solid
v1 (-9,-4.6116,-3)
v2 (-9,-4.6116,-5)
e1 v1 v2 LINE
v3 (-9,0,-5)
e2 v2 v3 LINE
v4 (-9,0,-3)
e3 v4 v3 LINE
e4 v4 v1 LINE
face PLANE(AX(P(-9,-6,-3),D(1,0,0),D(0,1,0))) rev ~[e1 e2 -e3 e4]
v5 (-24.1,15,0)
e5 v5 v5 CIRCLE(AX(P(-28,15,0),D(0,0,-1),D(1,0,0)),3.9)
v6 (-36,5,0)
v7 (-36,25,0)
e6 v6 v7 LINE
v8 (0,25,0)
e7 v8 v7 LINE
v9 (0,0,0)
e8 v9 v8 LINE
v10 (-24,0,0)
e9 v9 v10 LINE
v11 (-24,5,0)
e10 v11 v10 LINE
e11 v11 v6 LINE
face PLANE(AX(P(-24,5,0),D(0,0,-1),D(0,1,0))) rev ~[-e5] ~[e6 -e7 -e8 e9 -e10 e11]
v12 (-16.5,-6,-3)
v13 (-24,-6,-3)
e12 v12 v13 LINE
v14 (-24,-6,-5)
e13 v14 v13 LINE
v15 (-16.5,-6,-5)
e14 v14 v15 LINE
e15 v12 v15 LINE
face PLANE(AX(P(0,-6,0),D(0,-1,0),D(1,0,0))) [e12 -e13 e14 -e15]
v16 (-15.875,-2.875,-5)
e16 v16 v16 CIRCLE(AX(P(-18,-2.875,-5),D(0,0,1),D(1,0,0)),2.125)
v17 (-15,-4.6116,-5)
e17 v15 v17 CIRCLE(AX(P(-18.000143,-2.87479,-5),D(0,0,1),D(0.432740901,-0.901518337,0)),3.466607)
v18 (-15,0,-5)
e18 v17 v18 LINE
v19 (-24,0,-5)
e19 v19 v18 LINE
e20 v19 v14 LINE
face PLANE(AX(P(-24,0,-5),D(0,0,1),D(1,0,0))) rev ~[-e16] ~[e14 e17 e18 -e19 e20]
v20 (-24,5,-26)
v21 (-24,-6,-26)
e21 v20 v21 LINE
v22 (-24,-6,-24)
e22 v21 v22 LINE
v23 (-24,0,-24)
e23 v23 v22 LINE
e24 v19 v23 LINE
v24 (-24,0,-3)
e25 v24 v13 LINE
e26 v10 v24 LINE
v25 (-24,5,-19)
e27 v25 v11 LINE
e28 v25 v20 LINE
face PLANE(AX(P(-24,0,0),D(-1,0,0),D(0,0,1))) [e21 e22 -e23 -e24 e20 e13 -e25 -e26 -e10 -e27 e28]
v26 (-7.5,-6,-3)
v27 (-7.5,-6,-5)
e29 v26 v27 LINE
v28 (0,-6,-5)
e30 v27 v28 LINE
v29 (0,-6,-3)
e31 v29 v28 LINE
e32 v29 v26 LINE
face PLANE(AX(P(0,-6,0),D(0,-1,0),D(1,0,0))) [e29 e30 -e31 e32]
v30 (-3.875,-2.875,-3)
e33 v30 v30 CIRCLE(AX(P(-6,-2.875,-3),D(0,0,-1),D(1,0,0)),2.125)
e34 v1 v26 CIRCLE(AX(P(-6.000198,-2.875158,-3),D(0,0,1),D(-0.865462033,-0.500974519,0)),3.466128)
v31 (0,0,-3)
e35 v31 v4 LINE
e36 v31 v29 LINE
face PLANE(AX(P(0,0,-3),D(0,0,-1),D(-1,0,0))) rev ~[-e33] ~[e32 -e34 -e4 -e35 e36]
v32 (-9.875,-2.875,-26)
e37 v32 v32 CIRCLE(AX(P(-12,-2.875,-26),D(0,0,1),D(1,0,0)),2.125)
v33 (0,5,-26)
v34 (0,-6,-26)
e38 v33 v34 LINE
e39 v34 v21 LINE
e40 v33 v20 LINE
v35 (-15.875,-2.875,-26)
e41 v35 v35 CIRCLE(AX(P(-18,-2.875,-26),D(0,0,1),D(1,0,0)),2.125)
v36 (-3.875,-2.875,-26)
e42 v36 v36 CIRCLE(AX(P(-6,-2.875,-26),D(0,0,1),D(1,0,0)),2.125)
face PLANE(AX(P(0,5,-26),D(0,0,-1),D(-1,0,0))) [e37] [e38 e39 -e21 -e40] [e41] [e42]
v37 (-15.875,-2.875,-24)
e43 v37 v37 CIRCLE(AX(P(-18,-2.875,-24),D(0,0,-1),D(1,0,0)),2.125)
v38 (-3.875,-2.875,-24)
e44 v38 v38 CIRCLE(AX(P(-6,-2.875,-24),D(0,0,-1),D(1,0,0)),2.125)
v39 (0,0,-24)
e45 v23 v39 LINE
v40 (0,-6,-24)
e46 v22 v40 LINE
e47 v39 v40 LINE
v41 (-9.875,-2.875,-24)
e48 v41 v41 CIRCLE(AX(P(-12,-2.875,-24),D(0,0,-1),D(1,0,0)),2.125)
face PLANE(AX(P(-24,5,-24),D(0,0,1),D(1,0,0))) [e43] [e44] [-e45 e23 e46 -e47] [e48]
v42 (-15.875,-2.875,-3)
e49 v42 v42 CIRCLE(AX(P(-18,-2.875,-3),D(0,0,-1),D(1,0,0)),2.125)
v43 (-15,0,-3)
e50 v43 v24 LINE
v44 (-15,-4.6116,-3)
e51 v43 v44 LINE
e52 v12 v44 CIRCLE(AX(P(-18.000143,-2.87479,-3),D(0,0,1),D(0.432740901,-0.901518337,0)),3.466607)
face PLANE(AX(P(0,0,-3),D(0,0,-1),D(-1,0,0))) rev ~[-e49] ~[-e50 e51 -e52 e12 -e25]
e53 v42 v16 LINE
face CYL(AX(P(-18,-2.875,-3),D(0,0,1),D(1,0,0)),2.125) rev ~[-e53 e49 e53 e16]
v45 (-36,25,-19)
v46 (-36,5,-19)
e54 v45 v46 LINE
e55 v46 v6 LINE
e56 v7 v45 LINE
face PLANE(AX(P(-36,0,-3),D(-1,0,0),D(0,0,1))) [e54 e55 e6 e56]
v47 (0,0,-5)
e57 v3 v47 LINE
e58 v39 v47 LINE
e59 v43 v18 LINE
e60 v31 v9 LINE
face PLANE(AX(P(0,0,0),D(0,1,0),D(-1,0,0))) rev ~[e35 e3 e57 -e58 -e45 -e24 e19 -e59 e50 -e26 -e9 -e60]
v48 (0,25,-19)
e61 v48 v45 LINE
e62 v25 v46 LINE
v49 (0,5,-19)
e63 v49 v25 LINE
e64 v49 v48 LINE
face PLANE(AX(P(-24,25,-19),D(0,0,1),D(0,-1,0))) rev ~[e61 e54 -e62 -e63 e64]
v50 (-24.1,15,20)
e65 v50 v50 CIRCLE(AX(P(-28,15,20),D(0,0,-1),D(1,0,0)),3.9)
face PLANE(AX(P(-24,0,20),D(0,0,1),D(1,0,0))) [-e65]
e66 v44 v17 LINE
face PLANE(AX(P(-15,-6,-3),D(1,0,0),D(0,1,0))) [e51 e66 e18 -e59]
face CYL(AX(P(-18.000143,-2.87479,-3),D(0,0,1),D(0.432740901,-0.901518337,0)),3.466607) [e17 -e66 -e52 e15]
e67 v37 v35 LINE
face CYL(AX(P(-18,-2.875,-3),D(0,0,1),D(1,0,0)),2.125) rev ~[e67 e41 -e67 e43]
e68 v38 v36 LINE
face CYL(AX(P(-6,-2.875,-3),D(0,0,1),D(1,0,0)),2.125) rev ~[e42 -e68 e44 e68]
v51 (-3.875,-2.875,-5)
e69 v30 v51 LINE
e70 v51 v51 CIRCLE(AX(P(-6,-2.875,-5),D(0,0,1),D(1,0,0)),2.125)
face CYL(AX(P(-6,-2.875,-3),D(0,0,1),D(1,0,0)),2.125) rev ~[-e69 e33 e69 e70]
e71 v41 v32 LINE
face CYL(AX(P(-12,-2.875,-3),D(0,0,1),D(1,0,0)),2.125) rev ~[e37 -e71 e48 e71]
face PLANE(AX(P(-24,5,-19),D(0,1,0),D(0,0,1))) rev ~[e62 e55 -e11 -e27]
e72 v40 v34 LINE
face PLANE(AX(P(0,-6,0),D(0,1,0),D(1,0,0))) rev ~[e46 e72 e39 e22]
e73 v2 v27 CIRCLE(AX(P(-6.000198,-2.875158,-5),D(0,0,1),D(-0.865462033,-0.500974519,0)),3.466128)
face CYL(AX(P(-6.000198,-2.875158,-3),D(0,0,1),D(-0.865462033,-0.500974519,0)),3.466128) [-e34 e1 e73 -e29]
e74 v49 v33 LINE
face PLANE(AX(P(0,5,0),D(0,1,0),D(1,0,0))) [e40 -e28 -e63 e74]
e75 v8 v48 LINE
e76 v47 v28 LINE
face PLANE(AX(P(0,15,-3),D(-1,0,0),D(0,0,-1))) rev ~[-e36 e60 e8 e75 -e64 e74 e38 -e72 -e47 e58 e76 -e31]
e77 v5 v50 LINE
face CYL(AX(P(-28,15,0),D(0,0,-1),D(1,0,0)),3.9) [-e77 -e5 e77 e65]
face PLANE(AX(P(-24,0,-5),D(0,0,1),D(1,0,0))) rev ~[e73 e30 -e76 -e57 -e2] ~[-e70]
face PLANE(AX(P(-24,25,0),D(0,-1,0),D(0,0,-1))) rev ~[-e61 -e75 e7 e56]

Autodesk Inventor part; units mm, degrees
ref_plane "YZ Plane" through (0, 0, 0) normal (1, 0, 0) x (0, 1, 0)
ref_plane "XZ Plane" through (0, 0, 0) normal (0, 1, 0) x (-1, 0, 0)
ref_plane "XY Plane" through (0, 0, 0) normal (0, 0, 1) x (1, 0, 0)
sketch "Sketch1" plane through (0, 0, 0) normal (0, 1, 0) x (-1, 0, 0)
  line L0 (0, 0) -> (24, 0)
  line L1 (24, 0) -> (24, -24)
  line L2 (24, -24) -> (0, -24)
  line L3 (0, -24) -> (0, 0)
  dimension "d0" = 24
  dimension "d1" = 24
extrude "Extrusion1" add sketch "Sketch1" along normal blind 5
sketch "Sketch2" plane through (0, 0, 0) normal (0, -1, 0) x (1, 0, 0)
  line L0 (0, 0) -> (0, -3)
  line L1 (0, 0) -> (0, -24) projected
  line L2 (-24, -24) -> (-24, 0) projected
  line L3 (0, -3) -> (-24, -3)
  line L4 (-24, -3) -> (-24, -5)
  line L5 (-24, -5) -> (0, -5)
  line L6 (0, -5) -> (0, -3)
  dimension "d4" = 3
  dimension "d5" = 2
extrude "Extrusion2" add sketch "Sketch2" along normal blind 6
sketch "Sketch3" plane through (-24, 0, -3) normal (0, 0, 1) x (1, 0, 0)
  line L0 (24, -6) -> (0, -6)
  line L1 (0, -6) -> (24, -6) projected
  line L2 (12, -6) -> (12, -5)
  line L3 (12, -5) -> (12, -2.875)
  circle A0 centre (12, -2.875) radius 2.125
  point P0 (24, 0)
  dimension "d8" = 1
  dimension "d11" = 2.125
  dimension "d12" = 4.25
sketch "Sketch4" plane through (0, 5, 0) normal (0, 1, 0) x (1, 0, 0)
  line L0 (-24, 24) -> (0, 24)
  line L1 (0, 24) -> (0, 26)
  line L2 (0, 26) -> (-24, 26)
  line L3 (-24, 26) -> (-24, 24)
  point P0 (0, 0)
  dimension "d13" = 2
extrude "Extrusion3" add sketch "Sketch4" against normal blind 11
sketch "Sketch5" plane through (0, 5, 0) normal (0, 1, 0) x (1, 0, 0)
  line L0 (-24, 5) -> (-24, 24) projected
  line L1 (0, 3) -> (-24, 3)
  line L2 (-24, 3) -> (-24, 9)
  line L3 (-24, 9) -> (0, 9)
  line L4 (0, 9) -> (0, 3)
  point P0 (0, 0)
  dimension "d16" = 6
extrude "Extrusion4" add sketch "Sketch5" along normal blind 10
extrude "Extrusion6" cut sketch "Sketch3" against normal through all
pattern_linear "Rectangular Pattern1" count 3 spacing 6 along (-1, 0, 0) of "Extrusion6" first direction both ways yes
sketch "Sketch7" plane through (0, 5, -26) normal (0, 0, -1) x (-1, 0, 0)
  circle A0 centre (18, -7.875) radius 2.125 projected
  line L0 (15.875, -7.875) -> (14.125, -7.875)
  circle A1 centre (12, -7.875) radius 2.125 projected
  circle A2 centre (6, -7.875) radius 2.125 projected
  line L1 (8.125, -7.875) -> (9.875, -7.875)
  line L2 (15, -7.875) -> (15, -11)
  line L3 (24, -11) -> (0, -11) projected
  line L4 (9, -7.875) -> (9, -5)
  line L5 (0, -5) -> (24, -5) projected
  line L6 (15, -11) -> (9, -11)
  line L7 (9, -11) -> (9, -5)
  line L8 (9, -5) -> (15, -5)
  line L9 (15, -5) -> (15, -11)
sketch "Sketch8" plane through (-24, 0, -3) normal (0, 0, 1) x (1, 0, 0)
  circle A0 centre (18, -2.875) radius 2.125 projected
  line L0 (15.875, -2.875) -> (14.125, -2.875)
  circle A1 centre (12, -2.875) radius 2.125 projected
  line L1 (9.875, -2.875) -> (8.125, -2.875)
  circle A2 centre (6, -2.875) radius 2.125 projected
  line L2 (0, -6) -> (24, -6) projected
  line L3 (9, -6) -> (9, 0)
  line L4 (24, 0) -> (0, 0) projected
  line L5 (15, -6) -> (15, 0)
  line L6 (15, -6) -> (9, -6)
  line L7 (9, -6) -> (9, 0)
  line L8 (9, 0) -> (15, 0)
  line L9 (15, 0) -> (15, -6)
extrude "Extrusion7" cut sketch "Sketch8" against normal blind 2 contours L5 L2 L3 L1 A1 L0 | L0 A1 L1 L3 L4 L5
sketch "Sketch9" plane through (0, -6, -3) normal (0, 0, 1) x (1, 0, 0)
  line L0 (-9, 6) -> (-9, 0) projected
  line L1 (-9, 0) -> (0, 0) projected
  circle A0 centre (-6, 3.125) radius 2.125 projected
  line L2 (-15, 0) -> (-15, 6) projected
  line L3 (-24, 0) -> (0, 0) projected
  circle A1 centre (-18, 3.125) radius 2.125 projected
  line L4 (-9, 0) -> (-7.5, 0)
  line L5 (-15, 0) -> (-16.5, 0)
  line L6 (-9, 0) -> (-9, 1.3884)
  arc A2 (-9, 1.3884) -> (-7.5, 0) centre (-6, 3.125) ccw
  line L7 (-15, 0) -> (-15, 1.3884)
  arc A3 (-16.5, 0) -> (-15, 1.3884) centre (-18, 3.125) ccw
  point P0 (0, 6)
  dimension "d33" = 1.5
  dimension "d34" = 1.5
extrude "Extrusion8" cut sketch "Sketch9" against normal blind 2 contours A2 L1 L0 | L3 A3 L2
sketch "Sketch10" plane through (0, 0, 0) normal (1, 0, 0) x (0, 0, -1)
  line L0 (9, 5) -> (19, 5)
  line L1 (19, 5) -> (19, 15)
  line L2 (19, 15) -> (9, 15)
  line L3 (9, 15) -> (9, 5)
  point P0 (0, 0)
  dimension "d37" = 10
extrude "Extrusion9" add sketch "Sketch10" against normal blind 24
sketch "Sketch11" plane through (0, 15, 0) normal (0, 1, 0) x (1, 0, 0)
  line L0 (0, 5) -> (0, 19)
  line L1 (0, 19) -> (-24, 19)
  line L2 (-24, 19) -> (-24, 3)
  line L3 (-24, 3) -> (0, 3)
  line L4 (0, 3) -> (0, 19)
  point P0 (0, 0)
  point P1 (-24, 5)
extrude "Extrusion10" add sketch "Sketch11" along normal blind 10
sketch "Sketch13" plane through (0, 0, 0) normal (1, 0, 0) x (0, 0, -1)
  line L0 (3, 25) -> (19, 25)
  line L1 (19, 25) -> (19, 5)
  line L2 (19, 5) -> (3, 5)
  line L3 (3, 5) -> (3, 25)
  point P0 (0, 0)
extrude "Extrusion11" add sketch "Sketch13" along normal blind 12
sketch "Sketch14" plane through (-24, 5, -3) normal (0, 0, 1) x (1, 0, 0)
  line L0 (24, 0) -> (24, 20)
  line L1 (0, 20) -> (36, 20) projected
  line L2 (24, 10) -> (32, 10)
  circle A0 centre (28, 10) radius 3.75
  point P0 (24, -5)
  dimension "d44" = 8
  dimension "d45" = 7.5
extrude "Extrusion12" add sketch "Sketch14" along normal blind 20
sketch "Sketch15" plane through (-24, 0, 0) normal (-1, 0, 0) x (0, 0, 1)
  line L0 (-3, 25) -> (0, 25)
  line L1 (0, 25) -> (0, 5)
  line L2 (0, 5) -> (-3, 5)
  line L3 (-3, 5) -> (-3, 25)
  point P0 (0, 0)
extrude "Extrusion13" add sketch "Sketch15" against normal blind 36
sketch "Sketch16" plane through (-24, 0, -3) normal (-1, 0, 0) x (0, 0, 1)
  line L0 (3, 25) -> (-16, 25)
  line L1 (-16, 25) -> (-16, 5)
  line L2 (-16, 5) -> (3, 5)
  line L3 (3, 5) -> (3, 25)
  point P0 (3, 0)
extrude "Extrusion14" add sketch "Sketch16" along normal blind 12
sketch "Sketch17" plane through (-24, 0, 0) normal (0, 0, 1) x (1, 0, 0)
  line L0 (-12, 25) -> (-12, 5) projected
  line L1 (-12, 15) -> (-4, 15)
  circle A0 centre (-4, 15) radius 3.9
  point P0 (24, 0)
  dimension "d52" = 8
  dimension "d53" = 7.8
extrude "Extrusion15" add sketch "Sketch17" along normal blind 20
sketch "Sketch18" plane through (-24, 0, 0) normal (0, 0, 1) x (1, 0, 0)
  line L0 (24, 5) -> (36, 5)
  line L1 (36, 5) -> (36, 25)
  line L2 (36, 25) -> (24, 25)
  line L3 (24, 25) -> (24, 5)
  point P0 (24, 0)
extrude "Extrusion16" cut sketch "Sketch18" along normal through all both and the other way through all
properties part number "RearBearingMount"
